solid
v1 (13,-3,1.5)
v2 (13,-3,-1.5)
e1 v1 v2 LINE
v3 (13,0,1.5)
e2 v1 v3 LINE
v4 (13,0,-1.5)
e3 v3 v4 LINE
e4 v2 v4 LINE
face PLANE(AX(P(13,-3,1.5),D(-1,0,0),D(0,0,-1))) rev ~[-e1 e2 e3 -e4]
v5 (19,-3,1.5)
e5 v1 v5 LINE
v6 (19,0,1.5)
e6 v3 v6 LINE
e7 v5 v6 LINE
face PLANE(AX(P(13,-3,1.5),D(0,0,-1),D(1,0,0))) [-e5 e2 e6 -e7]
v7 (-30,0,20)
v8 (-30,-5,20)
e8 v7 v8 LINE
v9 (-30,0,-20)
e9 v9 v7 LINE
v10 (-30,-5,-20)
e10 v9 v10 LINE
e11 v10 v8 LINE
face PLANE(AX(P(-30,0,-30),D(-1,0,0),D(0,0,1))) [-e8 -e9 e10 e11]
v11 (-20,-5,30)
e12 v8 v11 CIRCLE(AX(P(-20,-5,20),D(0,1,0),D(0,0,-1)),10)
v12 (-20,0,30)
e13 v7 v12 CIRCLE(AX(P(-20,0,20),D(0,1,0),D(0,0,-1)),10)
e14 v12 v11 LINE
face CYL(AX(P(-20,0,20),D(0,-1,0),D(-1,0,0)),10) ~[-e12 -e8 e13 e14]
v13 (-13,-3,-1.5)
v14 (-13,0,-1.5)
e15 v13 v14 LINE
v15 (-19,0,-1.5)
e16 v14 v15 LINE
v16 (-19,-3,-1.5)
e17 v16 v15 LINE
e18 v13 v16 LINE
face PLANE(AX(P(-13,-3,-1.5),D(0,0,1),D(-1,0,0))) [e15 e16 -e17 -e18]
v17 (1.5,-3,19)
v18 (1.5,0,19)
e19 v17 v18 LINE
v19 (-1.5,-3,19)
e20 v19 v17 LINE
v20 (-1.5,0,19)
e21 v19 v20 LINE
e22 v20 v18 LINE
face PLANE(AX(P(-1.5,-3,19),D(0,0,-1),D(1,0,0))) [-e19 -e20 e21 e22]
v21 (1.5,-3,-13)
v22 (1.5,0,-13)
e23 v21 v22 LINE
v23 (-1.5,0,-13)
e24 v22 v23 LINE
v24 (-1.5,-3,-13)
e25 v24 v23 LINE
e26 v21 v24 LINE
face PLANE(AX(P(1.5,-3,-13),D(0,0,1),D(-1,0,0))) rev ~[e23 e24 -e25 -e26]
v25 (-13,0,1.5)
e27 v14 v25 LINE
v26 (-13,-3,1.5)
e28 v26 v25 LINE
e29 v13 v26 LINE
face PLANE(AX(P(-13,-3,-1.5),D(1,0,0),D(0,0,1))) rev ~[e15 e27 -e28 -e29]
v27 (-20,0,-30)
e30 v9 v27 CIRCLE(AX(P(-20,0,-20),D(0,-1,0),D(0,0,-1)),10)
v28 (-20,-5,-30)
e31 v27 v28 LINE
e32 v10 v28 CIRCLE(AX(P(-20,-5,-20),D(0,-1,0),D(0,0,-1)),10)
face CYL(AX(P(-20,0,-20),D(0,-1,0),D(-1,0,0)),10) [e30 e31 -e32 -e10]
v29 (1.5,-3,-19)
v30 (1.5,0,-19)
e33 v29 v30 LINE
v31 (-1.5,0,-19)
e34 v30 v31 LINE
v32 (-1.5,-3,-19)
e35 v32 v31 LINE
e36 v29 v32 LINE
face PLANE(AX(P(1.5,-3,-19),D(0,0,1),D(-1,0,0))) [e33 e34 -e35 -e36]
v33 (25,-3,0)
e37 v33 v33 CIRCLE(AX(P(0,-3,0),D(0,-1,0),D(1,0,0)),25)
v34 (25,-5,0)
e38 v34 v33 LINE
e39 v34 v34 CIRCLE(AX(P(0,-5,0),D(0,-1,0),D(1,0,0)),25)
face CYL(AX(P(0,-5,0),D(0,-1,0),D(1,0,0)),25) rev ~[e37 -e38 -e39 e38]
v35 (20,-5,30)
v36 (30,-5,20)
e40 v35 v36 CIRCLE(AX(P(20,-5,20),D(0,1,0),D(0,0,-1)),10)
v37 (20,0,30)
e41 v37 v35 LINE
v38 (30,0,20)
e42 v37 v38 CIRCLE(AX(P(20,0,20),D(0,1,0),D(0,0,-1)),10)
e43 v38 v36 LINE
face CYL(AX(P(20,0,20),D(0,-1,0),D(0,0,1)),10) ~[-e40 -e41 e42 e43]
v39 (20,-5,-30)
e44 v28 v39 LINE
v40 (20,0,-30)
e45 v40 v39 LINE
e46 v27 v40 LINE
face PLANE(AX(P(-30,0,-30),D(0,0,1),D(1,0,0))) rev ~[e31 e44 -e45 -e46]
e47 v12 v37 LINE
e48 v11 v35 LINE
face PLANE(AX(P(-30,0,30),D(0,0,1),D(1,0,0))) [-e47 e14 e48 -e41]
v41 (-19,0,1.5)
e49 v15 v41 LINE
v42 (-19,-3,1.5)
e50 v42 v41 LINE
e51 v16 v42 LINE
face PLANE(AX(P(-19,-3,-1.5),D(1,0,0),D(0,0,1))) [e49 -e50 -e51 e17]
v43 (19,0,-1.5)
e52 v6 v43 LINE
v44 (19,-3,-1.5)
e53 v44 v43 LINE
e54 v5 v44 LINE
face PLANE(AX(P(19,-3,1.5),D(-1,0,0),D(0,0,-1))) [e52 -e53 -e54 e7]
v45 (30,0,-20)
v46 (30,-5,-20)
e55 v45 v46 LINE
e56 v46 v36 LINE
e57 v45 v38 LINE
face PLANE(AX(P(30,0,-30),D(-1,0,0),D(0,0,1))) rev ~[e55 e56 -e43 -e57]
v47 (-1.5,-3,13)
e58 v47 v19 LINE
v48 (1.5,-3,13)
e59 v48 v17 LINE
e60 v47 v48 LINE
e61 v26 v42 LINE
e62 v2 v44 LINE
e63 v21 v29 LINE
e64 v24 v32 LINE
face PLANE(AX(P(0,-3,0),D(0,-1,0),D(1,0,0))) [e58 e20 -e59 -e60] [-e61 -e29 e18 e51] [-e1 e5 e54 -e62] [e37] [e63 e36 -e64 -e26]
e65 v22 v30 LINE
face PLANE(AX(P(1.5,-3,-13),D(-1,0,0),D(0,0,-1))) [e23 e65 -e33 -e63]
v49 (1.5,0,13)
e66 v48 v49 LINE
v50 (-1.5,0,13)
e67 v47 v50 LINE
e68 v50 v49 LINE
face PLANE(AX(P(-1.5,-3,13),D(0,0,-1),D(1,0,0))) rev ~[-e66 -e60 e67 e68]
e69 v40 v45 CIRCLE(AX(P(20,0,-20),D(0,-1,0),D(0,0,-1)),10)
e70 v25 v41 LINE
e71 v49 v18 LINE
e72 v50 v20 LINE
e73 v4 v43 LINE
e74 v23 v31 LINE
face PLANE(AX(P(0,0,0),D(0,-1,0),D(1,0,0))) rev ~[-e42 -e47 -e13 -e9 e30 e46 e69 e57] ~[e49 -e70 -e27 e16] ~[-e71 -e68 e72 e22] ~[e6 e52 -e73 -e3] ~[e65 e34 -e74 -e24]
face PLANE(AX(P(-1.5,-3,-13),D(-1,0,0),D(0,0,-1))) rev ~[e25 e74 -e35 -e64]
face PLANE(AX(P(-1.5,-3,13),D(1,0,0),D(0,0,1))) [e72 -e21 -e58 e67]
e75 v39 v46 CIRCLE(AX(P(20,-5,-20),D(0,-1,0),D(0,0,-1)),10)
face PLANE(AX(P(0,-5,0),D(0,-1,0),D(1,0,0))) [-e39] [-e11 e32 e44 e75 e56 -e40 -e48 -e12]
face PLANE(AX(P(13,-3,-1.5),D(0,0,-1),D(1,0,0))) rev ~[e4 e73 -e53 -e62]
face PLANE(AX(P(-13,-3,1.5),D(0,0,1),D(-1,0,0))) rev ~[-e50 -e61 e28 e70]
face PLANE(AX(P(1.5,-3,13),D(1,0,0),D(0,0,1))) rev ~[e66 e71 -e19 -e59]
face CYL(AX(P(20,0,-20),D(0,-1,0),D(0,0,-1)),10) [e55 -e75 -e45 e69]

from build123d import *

# Parameters (mm, degrees)
F0_W            = 60
F0_H            = 60
F1_DEPTH        = 5
F2_R            = 25
F3_DEPTH        = 2
F4_R            = 10
F5_R            = 10
F6_R            = 10
F7_R            = 10
F8_W            = 3
F8_H            = 6
F9_DEPTH        = 3.001
F9_COPIES_COUNT = 4


# Not quite as in the source:
# - a pattern or mirror of a feature is missing from the dataset's text; its kind, count and spacing are read off the source's solid


with BuildPart() as f1:
    # F0 (on Front) → F1 (new body)
    with BuildSketch(Plane.XZ):
        Rectangle(F0_W, F0_H)
    extrude(amount=F1_DEPTH)

    # F2 (on face) → F3 (cut)
    with BuildSketch(Plane.XZ.offset(5)):
        Circle(F2_R)
    extrude(amount=-F3_DEPTH, mode=Mode.SUBTRACT)

    # F4
    f4_edges = [f1.edges().sort_by_distance(p)[0] for p in [
        (-30, -2.5, 30),
    ]]
    fillet(f4_edges, radius=F4_R)

    # F5
    f5_edges = [f1.edges().sort_by_distance(p)[0] for p in [
        (30, -2.5, 30),
    ]]
    fillet(f5_edges, radius=F5_R)

    # F6
    f6_edges = [f1.edges().sort_by_distance(p)[0] for p in [
        (-30, -2.5, -30),
    ]]
    fillet(f6_edges, radius=F6_R)

    # F7
    f7_edges = [f1.edges().sort_by_distance(p)[0] for p in [
        (30, -2.5, -30),
    ]]
    fillet(f7_edges, radius=F7_R)

    # F8 (on face) → F9 (cut, through all)
    with BuildSketch(Plane.XZ.offset(3)):
        with Locations((0, 16)):
            Rectangle(F8_W, F8_H)
    f9 = extrude(amount=-F9_DEPTH, mode=Mode.SUBTRACT)

    # F9_copies: F9 ×4 about axis
    f9_copies_axis = Axis((0, 0, 0), (0, 1, 0))
    for i in range(1, F9_COPIES_COUNT):
        add(f9.rotate(f9_copies_axis, i * 360 / F9_COPIES_COUNT), mode=Mode.SUBTRACT)


solid = f1.part
